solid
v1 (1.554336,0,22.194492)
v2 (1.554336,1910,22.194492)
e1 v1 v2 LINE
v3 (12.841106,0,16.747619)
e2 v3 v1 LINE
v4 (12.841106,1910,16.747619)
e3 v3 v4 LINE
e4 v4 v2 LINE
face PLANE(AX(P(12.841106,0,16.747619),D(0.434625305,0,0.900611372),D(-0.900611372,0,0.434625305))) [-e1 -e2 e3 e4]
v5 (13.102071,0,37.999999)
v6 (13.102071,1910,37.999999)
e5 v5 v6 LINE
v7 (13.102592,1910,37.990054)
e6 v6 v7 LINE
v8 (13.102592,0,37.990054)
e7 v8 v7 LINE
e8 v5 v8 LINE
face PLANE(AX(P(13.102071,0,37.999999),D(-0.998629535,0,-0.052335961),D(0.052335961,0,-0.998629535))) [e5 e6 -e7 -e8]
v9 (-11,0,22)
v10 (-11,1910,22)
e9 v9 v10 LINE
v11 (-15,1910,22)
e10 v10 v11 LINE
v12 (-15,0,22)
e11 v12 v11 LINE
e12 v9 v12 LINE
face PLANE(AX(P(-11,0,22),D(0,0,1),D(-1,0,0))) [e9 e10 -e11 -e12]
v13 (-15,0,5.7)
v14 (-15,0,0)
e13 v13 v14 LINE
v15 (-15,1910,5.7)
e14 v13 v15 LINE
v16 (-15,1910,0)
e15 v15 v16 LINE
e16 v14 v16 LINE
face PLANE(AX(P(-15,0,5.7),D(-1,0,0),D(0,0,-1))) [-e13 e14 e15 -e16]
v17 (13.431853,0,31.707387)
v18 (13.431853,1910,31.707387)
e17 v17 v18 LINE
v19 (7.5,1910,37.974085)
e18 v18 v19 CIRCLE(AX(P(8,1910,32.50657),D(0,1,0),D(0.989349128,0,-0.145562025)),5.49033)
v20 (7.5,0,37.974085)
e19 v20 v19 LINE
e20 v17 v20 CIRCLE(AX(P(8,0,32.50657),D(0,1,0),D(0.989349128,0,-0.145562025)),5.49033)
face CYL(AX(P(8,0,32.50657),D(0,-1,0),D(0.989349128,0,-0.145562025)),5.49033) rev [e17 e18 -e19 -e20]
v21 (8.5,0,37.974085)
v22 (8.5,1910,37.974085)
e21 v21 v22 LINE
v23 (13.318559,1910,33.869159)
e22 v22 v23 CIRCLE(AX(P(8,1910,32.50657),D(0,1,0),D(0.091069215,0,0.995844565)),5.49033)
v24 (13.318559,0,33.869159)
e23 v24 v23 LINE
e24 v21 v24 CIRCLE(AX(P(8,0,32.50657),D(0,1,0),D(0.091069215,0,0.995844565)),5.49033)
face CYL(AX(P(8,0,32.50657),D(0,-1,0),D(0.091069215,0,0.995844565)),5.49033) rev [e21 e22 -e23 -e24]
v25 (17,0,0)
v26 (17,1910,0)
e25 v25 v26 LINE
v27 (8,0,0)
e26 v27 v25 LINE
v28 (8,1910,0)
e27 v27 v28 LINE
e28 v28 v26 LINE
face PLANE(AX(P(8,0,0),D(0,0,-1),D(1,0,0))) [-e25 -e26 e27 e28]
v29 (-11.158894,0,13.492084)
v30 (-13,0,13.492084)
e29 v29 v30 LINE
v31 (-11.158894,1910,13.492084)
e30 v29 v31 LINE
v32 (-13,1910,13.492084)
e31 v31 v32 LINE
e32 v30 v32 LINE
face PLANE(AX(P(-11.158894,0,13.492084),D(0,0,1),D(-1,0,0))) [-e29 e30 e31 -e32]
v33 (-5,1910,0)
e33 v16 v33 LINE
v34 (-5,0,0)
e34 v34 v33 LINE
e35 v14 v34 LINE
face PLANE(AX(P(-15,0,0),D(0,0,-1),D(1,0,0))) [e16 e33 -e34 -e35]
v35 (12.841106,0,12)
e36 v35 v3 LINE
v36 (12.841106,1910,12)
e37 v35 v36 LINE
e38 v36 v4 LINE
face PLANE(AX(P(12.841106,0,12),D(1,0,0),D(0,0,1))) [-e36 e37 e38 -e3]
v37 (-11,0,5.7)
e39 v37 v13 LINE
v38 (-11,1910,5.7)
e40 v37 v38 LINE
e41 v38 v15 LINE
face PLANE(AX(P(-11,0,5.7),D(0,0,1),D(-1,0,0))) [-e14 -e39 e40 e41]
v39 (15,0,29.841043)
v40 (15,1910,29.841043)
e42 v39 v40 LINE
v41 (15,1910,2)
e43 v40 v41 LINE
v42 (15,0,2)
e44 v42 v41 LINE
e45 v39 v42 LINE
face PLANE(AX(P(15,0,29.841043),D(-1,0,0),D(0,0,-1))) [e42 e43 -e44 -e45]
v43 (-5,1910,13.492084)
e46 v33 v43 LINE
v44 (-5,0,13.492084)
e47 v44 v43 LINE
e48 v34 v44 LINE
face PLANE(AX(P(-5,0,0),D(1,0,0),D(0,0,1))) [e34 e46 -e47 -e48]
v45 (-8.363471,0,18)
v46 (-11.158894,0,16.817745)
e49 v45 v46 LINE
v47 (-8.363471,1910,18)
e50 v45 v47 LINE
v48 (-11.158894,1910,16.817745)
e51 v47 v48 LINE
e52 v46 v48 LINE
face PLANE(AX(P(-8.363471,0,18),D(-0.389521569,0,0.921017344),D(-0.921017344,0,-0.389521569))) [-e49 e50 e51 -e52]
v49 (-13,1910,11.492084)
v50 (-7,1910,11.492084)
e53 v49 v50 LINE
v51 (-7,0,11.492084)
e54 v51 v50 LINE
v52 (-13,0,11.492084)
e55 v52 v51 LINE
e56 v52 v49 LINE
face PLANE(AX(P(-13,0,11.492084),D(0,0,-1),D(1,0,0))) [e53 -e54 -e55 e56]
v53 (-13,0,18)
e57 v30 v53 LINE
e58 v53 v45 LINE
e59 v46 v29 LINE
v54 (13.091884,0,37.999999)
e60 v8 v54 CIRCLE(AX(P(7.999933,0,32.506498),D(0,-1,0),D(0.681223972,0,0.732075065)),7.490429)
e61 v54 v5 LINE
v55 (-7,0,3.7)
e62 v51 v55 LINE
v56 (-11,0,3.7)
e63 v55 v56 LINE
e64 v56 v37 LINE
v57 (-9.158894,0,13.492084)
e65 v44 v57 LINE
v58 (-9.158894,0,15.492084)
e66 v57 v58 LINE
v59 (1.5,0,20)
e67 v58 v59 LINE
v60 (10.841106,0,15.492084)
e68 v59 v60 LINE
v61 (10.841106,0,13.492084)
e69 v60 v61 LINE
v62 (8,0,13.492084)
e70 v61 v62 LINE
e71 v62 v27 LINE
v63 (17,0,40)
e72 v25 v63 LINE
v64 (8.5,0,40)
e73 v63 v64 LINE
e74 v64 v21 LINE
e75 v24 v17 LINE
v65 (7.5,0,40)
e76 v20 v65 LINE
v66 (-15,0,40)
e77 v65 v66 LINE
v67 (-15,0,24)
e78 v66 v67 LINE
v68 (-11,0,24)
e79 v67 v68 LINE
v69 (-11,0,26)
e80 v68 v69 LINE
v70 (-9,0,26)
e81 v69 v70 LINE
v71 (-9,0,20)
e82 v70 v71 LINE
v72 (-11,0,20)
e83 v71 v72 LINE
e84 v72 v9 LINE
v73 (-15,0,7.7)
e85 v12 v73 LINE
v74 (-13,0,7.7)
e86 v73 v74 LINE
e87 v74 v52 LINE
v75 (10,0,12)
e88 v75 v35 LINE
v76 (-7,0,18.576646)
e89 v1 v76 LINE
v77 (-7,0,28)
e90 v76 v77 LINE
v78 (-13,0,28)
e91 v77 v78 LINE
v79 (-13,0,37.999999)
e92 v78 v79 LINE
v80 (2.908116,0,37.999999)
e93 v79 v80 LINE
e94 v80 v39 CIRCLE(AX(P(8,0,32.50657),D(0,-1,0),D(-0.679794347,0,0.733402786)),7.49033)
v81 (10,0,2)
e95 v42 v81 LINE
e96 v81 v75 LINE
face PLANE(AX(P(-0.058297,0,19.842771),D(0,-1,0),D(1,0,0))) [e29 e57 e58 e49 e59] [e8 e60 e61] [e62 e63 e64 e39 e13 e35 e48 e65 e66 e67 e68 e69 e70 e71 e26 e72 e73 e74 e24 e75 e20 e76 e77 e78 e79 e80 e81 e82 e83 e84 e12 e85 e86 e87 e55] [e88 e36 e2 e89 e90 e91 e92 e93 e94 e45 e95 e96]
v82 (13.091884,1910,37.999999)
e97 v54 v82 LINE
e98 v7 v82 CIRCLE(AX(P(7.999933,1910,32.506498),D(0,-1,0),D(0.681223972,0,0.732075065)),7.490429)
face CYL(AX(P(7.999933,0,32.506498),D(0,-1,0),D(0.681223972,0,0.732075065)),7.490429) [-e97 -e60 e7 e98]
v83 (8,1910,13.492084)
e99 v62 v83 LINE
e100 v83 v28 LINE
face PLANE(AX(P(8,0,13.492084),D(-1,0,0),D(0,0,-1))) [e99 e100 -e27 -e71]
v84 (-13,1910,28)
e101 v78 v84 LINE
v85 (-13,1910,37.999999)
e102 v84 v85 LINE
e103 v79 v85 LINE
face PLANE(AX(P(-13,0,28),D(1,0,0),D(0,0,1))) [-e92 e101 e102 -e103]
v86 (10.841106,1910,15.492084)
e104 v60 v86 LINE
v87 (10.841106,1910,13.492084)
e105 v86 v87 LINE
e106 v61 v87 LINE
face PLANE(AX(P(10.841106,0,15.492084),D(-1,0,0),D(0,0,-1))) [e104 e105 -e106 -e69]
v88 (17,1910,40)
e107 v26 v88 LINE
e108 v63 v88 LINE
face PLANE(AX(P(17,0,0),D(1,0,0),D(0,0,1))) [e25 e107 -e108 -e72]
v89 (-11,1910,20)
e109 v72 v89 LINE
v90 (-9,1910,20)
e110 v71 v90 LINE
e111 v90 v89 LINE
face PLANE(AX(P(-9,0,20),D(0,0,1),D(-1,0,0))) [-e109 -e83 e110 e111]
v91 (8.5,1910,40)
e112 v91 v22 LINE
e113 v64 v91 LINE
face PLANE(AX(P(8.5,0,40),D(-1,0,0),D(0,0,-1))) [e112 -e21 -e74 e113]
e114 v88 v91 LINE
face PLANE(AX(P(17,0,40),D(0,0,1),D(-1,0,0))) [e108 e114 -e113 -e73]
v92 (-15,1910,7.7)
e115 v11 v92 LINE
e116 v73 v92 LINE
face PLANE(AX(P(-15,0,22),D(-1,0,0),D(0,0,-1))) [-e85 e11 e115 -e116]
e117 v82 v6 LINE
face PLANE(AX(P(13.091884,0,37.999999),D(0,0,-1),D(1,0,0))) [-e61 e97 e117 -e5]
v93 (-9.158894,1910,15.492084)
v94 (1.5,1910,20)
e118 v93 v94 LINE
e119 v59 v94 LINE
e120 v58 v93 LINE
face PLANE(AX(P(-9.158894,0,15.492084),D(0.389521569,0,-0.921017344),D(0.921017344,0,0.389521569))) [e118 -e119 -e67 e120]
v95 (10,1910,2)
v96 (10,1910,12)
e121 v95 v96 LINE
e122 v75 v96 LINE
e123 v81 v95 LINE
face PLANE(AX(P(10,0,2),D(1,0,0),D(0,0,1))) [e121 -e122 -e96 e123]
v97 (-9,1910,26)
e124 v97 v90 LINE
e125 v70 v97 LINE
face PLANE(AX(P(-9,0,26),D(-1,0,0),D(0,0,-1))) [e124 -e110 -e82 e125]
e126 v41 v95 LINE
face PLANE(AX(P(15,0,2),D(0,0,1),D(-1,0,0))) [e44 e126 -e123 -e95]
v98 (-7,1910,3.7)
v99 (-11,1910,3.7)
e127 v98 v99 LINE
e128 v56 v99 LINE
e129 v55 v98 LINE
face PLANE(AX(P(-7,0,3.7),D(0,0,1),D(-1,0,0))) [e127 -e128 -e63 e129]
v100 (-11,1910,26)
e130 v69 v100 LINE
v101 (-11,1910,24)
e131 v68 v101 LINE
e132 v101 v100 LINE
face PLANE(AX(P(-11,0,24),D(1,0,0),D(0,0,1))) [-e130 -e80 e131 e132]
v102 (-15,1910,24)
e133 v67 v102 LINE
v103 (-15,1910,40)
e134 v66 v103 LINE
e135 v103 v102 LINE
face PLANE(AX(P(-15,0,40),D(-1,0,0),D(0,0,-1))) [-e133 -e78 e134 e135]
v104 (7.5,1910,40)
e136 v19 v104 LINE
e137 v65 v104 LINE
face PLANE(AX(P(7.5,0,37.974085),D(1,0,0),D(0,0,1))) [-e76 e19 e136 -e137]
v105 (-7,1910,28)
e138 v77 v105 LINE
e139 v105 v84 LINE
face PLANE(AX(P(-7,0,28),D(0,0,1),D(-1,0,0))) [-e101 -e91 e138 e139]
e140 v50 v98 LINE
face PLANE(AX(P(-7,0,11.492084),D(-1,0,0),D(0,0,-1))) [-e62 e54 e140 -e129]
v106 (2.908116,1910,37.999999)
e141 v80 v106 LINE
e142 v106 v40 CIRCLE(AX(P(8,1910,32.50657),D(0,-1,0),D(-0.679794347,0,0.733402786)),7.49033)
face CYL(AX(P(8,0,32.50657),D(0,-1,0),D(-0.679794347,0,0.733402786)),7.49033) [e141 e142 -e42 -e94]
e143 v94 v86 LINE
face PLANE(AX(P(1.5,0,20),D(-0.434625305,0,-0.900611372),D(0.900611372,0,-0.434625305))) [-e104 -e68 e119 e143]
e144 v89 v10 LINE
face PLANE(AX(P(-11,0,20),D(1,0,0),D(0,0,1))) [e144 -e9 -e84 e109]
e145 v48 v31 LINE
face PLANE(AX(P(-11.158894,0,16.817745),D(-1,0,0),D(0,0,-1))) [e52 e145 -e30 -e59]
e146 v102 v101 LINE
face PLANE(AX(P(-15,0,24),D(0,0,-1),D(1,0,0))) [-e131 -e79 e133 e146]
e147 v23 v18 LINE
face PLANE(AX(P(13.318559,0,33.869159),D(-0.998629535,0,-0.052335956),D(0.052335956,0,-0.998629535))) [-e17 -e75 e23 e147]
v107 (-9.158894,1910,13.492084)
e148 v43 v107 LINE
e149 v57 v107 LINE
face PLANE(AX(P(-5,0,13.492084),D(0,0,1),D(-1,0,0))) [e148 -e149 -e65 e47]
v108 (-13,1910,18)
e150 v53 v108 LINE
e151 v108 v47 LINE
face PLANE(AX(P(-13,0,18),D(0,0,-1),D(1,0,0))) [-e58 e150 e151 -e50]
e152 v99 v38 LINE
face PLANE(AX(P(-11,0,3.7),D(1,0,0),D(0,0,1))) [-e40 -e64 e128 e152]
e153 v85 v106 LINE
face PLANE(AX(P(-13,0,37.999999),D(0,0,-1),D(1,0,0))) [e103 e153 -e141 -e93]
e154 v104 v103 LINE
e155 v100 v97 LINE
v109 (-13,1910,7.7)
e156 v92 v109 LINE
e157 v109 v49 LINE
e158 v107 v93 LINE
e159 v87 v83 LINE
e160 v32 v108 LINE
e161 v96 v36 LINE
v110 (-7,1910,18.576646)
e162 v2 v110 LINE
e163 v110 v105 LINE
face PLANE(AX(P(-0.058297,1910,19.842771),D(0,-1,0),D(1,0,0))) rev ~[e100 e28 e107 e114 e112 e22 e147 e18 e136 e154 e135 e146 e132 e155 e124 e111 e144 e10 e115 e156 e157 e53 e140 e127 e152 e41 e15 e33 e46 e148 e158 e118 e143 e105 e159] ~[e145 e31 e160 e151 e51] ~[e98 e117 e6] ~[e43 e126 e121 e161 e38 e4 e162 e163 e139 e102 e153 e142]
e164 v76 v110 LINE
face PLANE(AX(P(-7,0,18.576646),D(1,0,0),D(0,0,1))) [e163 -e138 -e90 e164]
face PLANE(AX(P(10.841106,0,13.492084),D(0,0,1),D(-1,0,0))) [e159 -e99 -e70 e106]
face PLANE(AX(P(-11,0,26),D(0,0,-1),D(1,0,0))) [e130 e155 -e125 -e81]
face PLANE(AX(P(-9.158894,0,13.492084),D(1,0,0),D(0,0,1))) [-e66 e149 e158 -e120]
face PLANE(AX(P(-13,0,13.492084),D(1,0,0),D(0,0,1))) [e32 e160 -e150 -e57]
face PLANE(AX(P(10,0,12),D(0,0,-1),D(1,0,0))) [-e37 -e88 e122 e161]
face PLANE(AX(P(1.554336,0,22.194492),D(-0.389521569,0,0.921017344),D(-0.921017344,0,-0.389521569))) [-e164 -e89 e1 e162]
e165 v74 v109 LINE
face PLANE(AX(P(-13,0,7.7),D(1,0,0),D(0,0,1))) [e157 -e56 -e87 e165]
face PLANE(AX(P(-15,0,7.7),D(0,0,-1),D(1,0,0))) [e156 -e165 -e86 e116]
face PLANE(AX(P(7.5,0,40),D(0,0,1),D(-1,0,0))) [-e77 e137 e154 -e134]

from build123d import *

# Parameters (mm, degrees)
F2_DEPTH = 1910


# Not quite as in the source:
# - a feature of the source that left no trace in its solid (it failed there, or was rolled back) is left out


with BuildPart() as f2:
    # F1 (on Front) → F2 (new body)
    with BuildSketch(Plane.XZ):
        with BuildLine():
            Line((7.5, 37.974085065), (7.5, 40))
            Line((7.5, 40), (-15, 40))
            Line((-15, 40), (-15, 37))
            Line((-15, 37), (-15, 31))
            Line((-15, 31), (-15, 29))
            Line((-15, 29), (-15, 26))
            Line((-15, 26), (-15, 24))
            Line((-15, 24), (-13, 24))
            Line((-13, 24), (-11, 24))
            Line((-11, 24), (-11, 26))
            Line((-11, 26), (-9, 26))
            Line((-9, 26), (-9, 20))
            Line((-9, 20), (-11, 20))
            Line((-11, 20), (-11, 22))
            Line((-11, 22), (-15, 22))
            Line((-15, 22), (-15, 18))
            Line((-15, 18), (-15, 7.7))
            Line((-15, 7.7), (-13, 7.7))
            Line((-13, 7.7), (-13, 11.4920835048))
            Line((-13, 11.4920835048), (-7, 11.4920835048))
            Line((-7, 11.4920835048), (-7, 3.7))
            Line((-7, 3.7), (-11, 3.7))
            Line((-11, 3.7), (-11, 5.7))
            Line((-11, 5.7), (-15, 5.7))
            Line((-15, 5.7), (-15, 3))
            Line((-15, 3), (-15, 0))
            Line((-15, 0), (-13, 0))
            Line((-13, 0), (-12, 0))
            Line((-12, 0), (-5, 0))
            Line((-5, 0), (-5, 13.4920835048))
            Line((-5, 13.4920835048), (-7, 13.4920835048))
            Line((-7, 13.4920835048), (-9.1588944197, 13.4920835048))
            Line((-9.1588944197, 13.4920835048), (-9.1588944197, 15.4920835048))
            Line((-9.1588944197, 15.4920835048), (1.5, 20))
            Line((1.5, 20), (10.8411055803, 15.4920835048))
            Line((10.8411055803, 15.4920835048), (10.8411055803, 13.4920835048))
            Line((10.8411055803, 13.4920835048), (8, 13.4920835048))
            Line((8, 13.4920835048), (8, 0))
            Line((8, 0), (17, 0))
            Line((17, 0), (17, 40))
            Line((17, 40), (8.5, 40))
            Line((8.5, 40), (8.5, 37.974085065))
            ThreePointArc((8.5, 37.974085065), (11.5604089792, 36.6859489396), (13.3185590744, 33.8691589154))
            Line((13.3185590744, 33.8691589154), (13.4318527537, 31.7073867348))
            ThreePointArc((13.4318527537, 31.7073867348), (4.0126863822, 28.7323088758), (7.5, 37.974085065))
        make_face()
        Polygon((-8.3634709733, 18), (-11.1588944197, 16.817744602), (-11.1588944197, 15.4920835048), (-11.1588944197, 13.4920835048), (-13, 13.4920835048), (-13, 18), align=None, mode=Mode.SUBTRACT)
        with BuildLine():
            Line((-13, 34), (-13, 37.9999987781))
            Line((-13, 37.9999987781), (2.9081163149, 37.9999987781))
            ThreePointArc((2.9081163149, 37.9999987781), (3.810445381, 26.2974906682), (15, 29.8410427327))
            Line((15, 29.8410427327), (15, 2))
            Line((15, 2), (10, 2))
            Line((10, 2), (10, 12))
            Line((10, 12), (12.8411055803, 12))
            Line((12.8411055803, 12), (12.8411055803, 16.7476188273))
            Line((12.8411055803, 16.7476188273), (1.5543358685, 22.194491783))
            Line((1.5543358685, 22.194491783), (-7, 18.5766464184))
            Line((-7, 18.5766464184), (-7, 28))
            Line((-7, 28), (-13, 28))
            Line((-13, 28), (-13, 34))
        make_face(mode=Mode.SUBTRACT)
        with BuildLine():
            Line((13.0918836851, 37.9999987781), (13.1020709306, 37.9999987781))
            Line((13.1020709306, 37.9999987781), (13.1025921338, 37.9900536295))
            ThreePointArc((13.1025921338, 37.9900536295), (13.0972403349, 37.9950288154), (13.0918836851, 37.9999987781))
        make_face(mode=Mode.SUBTRACT)
    extrude(amount=-F2_DEPTH)


solid = f2.part
